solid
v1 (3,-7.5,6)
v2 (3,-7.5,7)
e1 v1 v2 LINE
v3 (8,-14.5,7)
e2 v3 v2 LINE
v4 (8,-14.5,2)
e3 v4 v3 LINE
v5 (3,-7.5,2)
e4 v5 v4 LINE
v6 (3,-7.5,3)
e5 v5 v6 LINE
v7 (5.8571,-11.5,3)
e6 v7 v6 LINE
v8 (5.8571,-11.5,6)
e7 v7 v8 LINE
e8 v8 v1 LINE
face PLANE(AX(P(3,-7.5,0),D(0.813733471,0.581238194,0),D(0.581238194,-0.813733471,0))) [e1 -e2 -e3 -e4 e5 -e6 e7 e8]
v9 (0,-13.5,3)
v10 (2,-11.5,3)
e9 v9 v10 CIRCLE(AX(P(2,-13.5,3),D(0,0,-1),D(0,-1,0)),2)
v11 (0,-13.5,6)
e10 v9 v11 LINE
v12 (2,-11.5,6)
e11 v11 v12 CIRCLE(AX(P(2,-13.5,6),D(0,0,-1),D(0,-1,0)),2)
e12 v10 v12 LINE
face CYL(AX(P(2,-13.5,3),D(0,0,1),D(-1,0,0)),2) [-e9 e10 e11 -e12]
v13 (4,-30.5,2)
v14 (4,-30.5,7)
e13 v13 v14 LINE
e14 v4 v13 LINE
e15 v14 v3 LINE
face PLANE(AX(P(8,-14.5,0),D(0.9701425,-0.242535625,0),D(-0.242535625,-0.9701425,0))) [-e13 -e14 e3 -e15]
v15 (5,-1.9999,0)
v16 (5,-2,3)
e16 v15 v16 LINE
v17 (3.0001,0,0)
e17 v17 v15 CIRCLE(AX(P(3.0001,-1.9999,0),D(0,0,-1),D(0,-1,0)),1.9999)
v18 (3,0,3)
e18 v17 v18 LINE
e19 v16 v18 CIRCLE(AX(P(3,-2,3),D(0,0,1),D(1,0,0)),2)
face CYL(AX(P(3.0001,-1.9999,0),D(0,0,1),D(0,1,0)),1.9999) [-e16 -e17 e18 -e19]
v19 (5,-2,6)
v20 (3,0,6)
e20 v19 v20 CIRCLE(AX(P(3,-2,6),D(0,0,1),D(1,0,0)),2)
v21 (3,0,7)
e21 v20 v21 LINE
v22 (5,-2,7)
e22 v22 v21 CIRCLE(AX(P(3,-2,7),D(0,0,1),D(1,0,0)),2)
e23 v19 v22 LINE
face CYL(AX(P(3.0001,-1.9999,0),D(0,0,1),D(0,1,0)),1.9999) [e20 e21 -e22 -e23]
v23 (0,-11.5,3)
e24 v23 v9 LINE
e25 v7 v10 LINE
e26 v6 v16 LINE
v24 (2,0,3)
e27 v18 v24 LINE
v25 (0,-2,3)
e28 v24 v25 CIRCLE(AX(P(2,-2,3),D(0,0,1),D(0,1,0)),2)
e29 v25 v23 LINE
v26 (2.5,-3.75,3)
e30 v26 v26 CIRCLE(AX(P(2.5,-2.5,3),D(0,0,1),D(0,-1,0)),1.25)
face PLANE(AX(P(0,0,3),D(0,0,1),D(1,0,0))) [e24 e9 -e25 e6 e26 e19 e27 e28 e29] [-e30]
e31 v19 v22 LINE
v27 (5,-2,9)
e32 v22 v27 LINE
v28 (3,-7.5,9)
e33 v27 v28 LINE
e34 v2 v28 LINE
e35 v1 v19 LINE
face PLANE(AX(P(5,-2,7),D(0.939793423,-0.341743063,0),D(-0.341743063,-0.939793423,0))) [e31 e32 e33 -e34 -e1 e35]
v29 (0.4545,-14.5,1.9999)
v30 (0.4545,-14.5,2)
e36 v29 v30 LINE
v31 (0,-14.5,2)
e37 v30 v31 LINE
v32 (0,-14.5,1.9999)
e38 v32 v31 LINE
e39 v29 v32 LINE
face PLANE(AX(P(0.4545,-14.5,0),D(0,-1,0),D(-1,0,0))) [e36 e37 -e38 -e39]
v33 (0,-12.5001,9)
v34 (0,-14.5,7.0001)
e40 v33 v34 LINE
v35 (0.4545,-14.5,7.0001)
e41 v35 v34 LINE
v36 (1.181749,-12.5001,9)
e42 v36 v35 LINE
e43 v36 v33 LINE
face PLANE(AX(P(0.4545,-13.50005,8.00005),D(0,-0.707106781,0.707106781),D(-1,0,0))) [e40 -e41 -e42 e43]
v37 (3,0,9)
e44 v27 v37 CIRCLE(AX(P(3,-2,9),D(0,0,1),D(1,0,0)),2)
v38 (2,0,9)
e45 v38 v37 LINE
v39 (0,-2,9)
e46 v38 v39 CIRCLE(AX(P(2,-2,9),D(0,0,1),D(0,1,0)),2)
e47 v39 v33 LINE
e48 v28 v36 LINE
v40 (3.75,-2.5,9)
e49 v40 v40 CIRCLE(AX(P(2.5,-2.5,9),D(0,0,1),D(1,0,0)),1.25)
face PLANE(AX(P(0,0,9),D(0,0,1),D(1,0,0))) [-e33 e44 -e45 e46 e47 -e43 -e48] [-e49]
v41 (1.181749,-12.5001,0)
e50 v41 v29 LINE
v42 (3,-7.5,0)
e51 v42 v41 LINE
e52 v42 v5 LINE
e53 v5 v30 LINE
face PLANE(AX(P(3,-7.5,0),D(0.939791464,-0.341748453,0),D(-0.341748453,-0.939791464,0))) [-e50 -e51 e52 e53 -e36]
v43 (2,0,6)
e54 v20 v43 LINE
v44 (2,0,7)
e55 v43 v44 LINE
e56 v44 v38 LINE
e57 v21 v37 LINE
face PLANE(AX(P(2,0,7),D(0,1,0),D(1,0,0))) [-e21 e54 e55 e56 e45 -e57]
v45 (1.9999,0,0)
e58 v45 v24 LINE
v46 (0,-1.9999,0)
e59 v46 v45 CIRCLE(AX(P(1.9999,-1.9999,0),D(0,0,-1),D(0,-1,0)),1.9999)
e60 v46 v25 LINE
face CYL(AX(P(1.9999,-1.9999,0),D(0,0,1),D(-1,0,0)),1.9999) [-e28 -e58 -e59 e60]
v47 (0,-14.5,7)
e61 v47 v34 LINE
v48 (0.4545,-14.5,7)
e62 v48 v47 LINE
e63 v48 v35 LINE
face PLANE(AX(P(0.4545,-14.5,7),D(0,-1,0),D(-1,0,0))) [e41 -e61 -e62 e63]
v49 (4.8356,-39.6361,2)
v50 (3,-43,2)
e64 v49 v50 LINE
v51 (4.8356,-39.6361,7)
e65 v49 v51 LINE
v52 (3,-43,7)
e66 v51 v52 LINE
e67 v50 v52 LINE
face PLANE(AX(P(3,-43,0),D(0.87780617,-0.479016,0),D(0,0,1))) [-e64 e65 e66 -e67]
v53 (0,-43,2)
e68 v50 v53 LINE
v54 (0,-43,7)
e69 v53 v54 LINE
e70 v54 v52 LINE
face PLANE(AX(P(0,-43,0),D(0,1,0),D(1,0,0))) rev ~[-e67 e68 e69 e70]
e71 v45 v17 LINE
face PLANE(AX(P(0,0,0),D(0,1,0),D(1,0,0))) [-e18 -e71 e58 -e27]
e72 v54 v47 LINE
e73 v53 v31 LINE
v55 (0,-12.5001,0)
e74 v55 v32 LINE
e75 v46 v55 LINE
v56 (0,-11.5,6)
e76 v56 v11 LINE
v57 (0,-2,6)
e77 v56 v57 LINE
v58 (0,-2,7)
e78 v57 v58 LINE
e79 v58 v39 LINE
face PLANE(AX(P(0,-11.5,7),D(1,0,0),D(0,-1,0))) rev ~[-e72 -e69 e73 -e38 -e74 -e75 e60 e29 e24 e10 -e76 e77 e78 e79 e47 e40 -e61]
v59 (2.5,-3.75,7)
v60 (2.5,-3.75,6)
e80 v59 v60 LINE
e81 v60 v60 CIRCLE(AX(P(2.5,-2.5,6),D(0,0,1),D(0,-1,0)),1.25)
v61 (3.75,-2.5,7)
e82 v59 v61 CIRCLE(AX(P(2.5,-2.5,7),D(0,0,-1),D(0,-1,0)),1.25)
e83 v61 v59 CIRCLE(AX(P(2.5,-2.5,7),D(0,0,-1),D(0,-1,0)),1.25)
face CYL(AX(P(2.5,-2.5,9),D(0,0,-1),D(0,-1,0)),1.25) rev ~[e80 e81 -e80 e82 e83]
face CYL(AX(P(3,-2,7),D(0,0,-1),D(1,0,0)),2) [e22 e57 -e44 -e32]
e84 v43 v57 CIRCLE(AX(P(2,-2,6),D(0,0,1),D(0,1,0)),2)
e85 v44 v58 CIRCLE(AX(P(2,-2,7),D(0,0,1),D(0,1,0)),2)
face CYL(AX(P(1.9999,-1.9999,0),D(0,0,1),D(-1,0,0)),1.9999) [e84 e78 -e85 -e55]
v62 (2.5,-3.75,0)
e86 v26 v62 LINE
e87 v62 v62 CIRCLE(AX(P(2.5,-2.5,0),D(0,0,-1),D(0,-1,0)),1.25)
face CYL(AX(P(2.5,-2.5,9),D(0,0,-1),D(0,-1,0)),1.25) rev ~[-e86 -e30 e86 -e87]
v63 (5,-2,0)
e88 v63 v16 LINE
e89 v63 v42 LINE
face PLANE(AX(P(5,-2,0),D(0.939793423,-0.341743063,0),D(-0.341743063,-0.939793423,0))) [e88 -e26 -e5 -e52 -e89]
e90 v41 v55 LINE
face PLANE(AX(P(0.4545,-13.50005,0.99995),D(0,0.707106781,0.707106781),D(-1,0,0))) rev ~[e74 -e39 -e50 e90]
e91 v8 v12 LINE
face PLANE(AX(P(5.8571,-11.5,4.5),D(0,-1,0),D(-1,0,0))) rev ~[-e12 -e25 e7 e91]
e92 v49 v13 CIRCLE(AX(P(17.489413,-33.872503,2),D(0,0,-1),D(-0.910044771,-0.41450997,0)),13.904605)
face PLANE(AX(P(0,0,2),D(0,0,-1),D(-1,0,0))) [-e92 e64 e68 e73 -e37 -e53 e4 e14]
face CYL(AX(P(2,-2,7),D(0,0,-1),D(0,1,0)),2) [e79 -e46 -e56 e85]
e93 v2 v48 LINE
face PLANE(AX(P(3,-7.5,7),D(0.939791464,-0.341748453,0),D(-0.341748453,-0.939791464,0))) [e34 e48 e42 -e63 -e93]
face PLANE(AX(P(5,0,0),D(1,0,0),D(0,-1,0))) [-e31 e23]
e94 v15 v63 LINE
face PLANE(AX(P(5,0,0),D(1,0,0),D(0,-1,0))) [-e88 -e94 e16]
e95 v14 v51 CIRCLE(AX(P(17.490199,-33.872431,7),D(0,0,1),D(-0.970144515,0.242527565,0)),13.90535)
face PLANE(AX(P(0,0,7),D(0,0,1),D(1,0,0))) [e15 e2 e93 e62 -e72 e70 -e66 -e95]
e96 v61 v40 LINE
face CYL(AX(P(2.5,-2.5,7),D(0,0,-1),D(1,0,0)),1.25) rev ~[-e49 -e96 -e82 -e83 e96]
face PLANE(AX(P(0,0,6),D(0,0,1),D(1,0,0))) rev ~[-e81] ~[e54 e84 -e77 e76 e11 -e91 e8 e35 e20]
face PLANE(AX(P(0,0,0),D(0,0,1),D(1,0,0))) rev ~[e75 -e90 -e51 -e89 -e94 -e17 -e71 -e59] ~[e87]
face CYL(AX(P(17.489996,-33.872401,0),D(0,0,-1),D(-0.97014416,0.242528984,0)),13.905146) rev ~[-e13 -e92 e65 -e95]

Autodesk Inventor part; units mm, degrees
ref_plane "YZ Plane" through (0, 0, 0) normal (1, 0, 0) x (0, 1, 0)
ref_plane "XZ Plane" through (0, 0, 0) normal (0, 1, 0) x (-1, 0, 0)
sketch "Base" plane through (0, 0, 0) normal (0, 0, 1) x (1, 0, 0)
  line L0 (0, 0) -> (0, -43)
  line L1 (0, 0) -> (5, 0)
  line L2 (5, 0) -> (5, -2)
  line L3 (3, -7.5) -> (8, -14.5)
  line L4 (8, -14.5) -> (4, -30.5)
  arc A0 (4, -30.5) -> (7, -43) centre (17.4898, -33.8724) ccw
  line L5 (0, -43) -> (7, -43)
  line L6 (5, -2) -> (3, -7.5)
  dimension "d0" = 43
  dimension "d1" = 5
  dimension "d6" = 16
  dimension "d10" = 4
  dimension "d51" = 3
  dimension "d52" = 8
  dimension "d53" = 5.5
  dimension "d54" = 2
  dimension "d55" = 7
  dimension "d112" = 7
extrude "BaseFeature" add sketch "Base" along normal blind 9
chamfer "EndChamferFeature" distance 4 angle 45 1 edges at (7, -43, 4.5)
sketch "MountHole" plane through (0, 0, 9) normal (0, 0, 1) x (1, 0, 0)
  circle A0 centre (2.5, -2.5) radius 1.25
  line L0 (5, 0) -> (0, 0) construction
  line L1 (0, 0) -> (0, -43) construction
  dimension "d40" = 2.5
  dimension "d41" = 2.5
  dimension "d42" = 2.5
hole "MountHoleFeature" at (2.5, -2.5, 9) direction (0, 0, -1) diameter 2.5 end through all
fillet "EndFilletsFeature" radius 2 2 edges at (0, 0, 4.5) (5, 0, 4.5)
ref_plane "MidPlane" through (0, 0, 4.5) normal (0, 0, 1) x (1, 0, 0)
sketch "MountCut" plane through (0, 0, 4.5) normal (0, 0, 1) x (1, 0, 0)
  line L0 (4.8356, -39.6361) -> (3, -43) projected
  arc A0 (4, -30.5) -> (4.8356, -39.6361) centre (17.4898, -33.8724) ccw projected
  line L1 (4, -30.5) -> (8, -14.5) projected
  line L2 (8, -14.5) -> (3, -7.5) projected
  line L3 (3, -7.5) -> (5, -2) projected
  arc A1 (5, -2) -> (3, 0) centre (3, -2) ccw projected
  line L4 (3, 0) -> (2, 0) projected
  arc A2 (2, 0) -> (0, -2) centre (2, -2) ccw projected
  line L5 (0, -2) -> (0, -43) projected
  circle A3 centre (2.5, -2.5) radius 1.25 projected
  line L6 (3, -7.5) -> (0, -7.5)
  line L7 (8, -14.5) -> (3, -7.5) projected
  line L8 (5.8571, -11.5) -> (0, -11.5)
  line L9 (0, -2) -> (0, -43) projected
  line L10 (0, -43) -> (3, -43) projected
  point P0 (0, -39.1407)
  dimension "d81" = 4
extrude "MountCutFeature" cut sketch "MountCut" along normal mid plane 3 contours L5 L6 L2 L8 | L5 A2 L4 A1 L3 L6
sketch "LeftTrim" plane through (0, 0, 9) normal (0, 0, 1) x (1, 0, 0)
  line L0 (4.8356, -39.6361) -> (3, -43) projected
  arc A0 (4, -30.5) -> (4.8356, -39.6361) centre (17.4898, -33.8724) ccw projected
  line L1 (4, -30.5) -> (8, -14.5) projected
  line L2 (8, -14.5) -> (3, -7.5) projected
  line L3 (3, -7.5) -> (5, -2) projected
  arc A1 (5, -2) -> (3, 0) centre (3, -2) ccw projected
  line L4 (3, 0) -> (2, 0) projected
  arc A2 (2, 0) -> (0, -2) centre (2, -2) ccw projected
  line L5 (0, -2) -> (0, -43) projected
  circle A3 centre (2.5, -2.5) radius 1.25 projected
  line L6 (3, -7.5) -> (-0.5, -7.5)
  line L7 (0, -43) -> (3, -43) projected
extrude "LeftTrimFeature" cut sketch "LeftTrim" against normal blind 2 contours L0 L7 L5 L6 L2 L1 A0 | L5 A2 L4 A1 L3 L6 | A3
sketch "LeftReinforce" plane through (0, 0, 7) normal (0, 0, 1) x (1, 0, 0)
  circle A0 centre (2.5, -2.5) radius 1.25 projected
  line L0 (0, -11.5) -> (0, -2) construction
  line L1 (5.8571, -11.5) -> (0, -11.5) construction
  line L2 (3, -7.5) -> (5.8571, -11.5) construction
  line L3 (5, -2) -> (3, -7.5) projected
  arc A1 (5, -2) -> (3, 0) centre (3, -2) ccw projected
  line L4 (2, 0) -> (3, 0) projected
  arc A2 (2, 0) -> (0, -2) centre (2, -2) ccw projected
  line L5 (0, -11.5) -> (0, -2)
  line L6 (0, -11.5) -> (0, -14.5)
  line L7 (3, -7.5) -> (0.4545, -14.5)
  line L8 (0.4545, -14.5) -> (0, -14.5)
  line L9 (0.4545, -14.5) -> (8, -14.5) construction
extrude "LeftReinforceFeature" add sketch "LeftReinforce" along normal blind 2
sketch "RightTrim" plane through (0, 0, 0) normal (0, 0, -1) x (-1, 0, 0)
  line L0 (0, -43) -> (0, -14.5) projected
  line L1 (-4.8356, -39.6361) -> (-3, -43) projected
  arc A0 (-4.8356, -39.6361) -> (-4, -30.5) centre (-17.4898, -33.8724) ccw projected
  line L2 (-8, -14.5) -> (-4, -30.5) projected
  line L3 (-3, -7.5) -> (-8, -14.5) projected
  line L4 (-3, -7.5) -> (-0.4545, -14.5) projected
  line L5 (-0.4545, -14.5) -> (0, -14.5) projected
  line L6 (-3, -43) -> (0, -43) projected
extrude "RightTrimFeature" cut sketch "RightTrim" against normal blind 2
chamfer "MountSideChamfersFeature" distance 2 angle 45 2 edges at (0.2273, -14.5, 9) (0.2273, -14.5, 0)
fillet "MiddleCutBottomFilletFeature" radius 2 1 edges at (0, -11.5, 4.5)
properties part number "ProximalPhalangeIndex2"
